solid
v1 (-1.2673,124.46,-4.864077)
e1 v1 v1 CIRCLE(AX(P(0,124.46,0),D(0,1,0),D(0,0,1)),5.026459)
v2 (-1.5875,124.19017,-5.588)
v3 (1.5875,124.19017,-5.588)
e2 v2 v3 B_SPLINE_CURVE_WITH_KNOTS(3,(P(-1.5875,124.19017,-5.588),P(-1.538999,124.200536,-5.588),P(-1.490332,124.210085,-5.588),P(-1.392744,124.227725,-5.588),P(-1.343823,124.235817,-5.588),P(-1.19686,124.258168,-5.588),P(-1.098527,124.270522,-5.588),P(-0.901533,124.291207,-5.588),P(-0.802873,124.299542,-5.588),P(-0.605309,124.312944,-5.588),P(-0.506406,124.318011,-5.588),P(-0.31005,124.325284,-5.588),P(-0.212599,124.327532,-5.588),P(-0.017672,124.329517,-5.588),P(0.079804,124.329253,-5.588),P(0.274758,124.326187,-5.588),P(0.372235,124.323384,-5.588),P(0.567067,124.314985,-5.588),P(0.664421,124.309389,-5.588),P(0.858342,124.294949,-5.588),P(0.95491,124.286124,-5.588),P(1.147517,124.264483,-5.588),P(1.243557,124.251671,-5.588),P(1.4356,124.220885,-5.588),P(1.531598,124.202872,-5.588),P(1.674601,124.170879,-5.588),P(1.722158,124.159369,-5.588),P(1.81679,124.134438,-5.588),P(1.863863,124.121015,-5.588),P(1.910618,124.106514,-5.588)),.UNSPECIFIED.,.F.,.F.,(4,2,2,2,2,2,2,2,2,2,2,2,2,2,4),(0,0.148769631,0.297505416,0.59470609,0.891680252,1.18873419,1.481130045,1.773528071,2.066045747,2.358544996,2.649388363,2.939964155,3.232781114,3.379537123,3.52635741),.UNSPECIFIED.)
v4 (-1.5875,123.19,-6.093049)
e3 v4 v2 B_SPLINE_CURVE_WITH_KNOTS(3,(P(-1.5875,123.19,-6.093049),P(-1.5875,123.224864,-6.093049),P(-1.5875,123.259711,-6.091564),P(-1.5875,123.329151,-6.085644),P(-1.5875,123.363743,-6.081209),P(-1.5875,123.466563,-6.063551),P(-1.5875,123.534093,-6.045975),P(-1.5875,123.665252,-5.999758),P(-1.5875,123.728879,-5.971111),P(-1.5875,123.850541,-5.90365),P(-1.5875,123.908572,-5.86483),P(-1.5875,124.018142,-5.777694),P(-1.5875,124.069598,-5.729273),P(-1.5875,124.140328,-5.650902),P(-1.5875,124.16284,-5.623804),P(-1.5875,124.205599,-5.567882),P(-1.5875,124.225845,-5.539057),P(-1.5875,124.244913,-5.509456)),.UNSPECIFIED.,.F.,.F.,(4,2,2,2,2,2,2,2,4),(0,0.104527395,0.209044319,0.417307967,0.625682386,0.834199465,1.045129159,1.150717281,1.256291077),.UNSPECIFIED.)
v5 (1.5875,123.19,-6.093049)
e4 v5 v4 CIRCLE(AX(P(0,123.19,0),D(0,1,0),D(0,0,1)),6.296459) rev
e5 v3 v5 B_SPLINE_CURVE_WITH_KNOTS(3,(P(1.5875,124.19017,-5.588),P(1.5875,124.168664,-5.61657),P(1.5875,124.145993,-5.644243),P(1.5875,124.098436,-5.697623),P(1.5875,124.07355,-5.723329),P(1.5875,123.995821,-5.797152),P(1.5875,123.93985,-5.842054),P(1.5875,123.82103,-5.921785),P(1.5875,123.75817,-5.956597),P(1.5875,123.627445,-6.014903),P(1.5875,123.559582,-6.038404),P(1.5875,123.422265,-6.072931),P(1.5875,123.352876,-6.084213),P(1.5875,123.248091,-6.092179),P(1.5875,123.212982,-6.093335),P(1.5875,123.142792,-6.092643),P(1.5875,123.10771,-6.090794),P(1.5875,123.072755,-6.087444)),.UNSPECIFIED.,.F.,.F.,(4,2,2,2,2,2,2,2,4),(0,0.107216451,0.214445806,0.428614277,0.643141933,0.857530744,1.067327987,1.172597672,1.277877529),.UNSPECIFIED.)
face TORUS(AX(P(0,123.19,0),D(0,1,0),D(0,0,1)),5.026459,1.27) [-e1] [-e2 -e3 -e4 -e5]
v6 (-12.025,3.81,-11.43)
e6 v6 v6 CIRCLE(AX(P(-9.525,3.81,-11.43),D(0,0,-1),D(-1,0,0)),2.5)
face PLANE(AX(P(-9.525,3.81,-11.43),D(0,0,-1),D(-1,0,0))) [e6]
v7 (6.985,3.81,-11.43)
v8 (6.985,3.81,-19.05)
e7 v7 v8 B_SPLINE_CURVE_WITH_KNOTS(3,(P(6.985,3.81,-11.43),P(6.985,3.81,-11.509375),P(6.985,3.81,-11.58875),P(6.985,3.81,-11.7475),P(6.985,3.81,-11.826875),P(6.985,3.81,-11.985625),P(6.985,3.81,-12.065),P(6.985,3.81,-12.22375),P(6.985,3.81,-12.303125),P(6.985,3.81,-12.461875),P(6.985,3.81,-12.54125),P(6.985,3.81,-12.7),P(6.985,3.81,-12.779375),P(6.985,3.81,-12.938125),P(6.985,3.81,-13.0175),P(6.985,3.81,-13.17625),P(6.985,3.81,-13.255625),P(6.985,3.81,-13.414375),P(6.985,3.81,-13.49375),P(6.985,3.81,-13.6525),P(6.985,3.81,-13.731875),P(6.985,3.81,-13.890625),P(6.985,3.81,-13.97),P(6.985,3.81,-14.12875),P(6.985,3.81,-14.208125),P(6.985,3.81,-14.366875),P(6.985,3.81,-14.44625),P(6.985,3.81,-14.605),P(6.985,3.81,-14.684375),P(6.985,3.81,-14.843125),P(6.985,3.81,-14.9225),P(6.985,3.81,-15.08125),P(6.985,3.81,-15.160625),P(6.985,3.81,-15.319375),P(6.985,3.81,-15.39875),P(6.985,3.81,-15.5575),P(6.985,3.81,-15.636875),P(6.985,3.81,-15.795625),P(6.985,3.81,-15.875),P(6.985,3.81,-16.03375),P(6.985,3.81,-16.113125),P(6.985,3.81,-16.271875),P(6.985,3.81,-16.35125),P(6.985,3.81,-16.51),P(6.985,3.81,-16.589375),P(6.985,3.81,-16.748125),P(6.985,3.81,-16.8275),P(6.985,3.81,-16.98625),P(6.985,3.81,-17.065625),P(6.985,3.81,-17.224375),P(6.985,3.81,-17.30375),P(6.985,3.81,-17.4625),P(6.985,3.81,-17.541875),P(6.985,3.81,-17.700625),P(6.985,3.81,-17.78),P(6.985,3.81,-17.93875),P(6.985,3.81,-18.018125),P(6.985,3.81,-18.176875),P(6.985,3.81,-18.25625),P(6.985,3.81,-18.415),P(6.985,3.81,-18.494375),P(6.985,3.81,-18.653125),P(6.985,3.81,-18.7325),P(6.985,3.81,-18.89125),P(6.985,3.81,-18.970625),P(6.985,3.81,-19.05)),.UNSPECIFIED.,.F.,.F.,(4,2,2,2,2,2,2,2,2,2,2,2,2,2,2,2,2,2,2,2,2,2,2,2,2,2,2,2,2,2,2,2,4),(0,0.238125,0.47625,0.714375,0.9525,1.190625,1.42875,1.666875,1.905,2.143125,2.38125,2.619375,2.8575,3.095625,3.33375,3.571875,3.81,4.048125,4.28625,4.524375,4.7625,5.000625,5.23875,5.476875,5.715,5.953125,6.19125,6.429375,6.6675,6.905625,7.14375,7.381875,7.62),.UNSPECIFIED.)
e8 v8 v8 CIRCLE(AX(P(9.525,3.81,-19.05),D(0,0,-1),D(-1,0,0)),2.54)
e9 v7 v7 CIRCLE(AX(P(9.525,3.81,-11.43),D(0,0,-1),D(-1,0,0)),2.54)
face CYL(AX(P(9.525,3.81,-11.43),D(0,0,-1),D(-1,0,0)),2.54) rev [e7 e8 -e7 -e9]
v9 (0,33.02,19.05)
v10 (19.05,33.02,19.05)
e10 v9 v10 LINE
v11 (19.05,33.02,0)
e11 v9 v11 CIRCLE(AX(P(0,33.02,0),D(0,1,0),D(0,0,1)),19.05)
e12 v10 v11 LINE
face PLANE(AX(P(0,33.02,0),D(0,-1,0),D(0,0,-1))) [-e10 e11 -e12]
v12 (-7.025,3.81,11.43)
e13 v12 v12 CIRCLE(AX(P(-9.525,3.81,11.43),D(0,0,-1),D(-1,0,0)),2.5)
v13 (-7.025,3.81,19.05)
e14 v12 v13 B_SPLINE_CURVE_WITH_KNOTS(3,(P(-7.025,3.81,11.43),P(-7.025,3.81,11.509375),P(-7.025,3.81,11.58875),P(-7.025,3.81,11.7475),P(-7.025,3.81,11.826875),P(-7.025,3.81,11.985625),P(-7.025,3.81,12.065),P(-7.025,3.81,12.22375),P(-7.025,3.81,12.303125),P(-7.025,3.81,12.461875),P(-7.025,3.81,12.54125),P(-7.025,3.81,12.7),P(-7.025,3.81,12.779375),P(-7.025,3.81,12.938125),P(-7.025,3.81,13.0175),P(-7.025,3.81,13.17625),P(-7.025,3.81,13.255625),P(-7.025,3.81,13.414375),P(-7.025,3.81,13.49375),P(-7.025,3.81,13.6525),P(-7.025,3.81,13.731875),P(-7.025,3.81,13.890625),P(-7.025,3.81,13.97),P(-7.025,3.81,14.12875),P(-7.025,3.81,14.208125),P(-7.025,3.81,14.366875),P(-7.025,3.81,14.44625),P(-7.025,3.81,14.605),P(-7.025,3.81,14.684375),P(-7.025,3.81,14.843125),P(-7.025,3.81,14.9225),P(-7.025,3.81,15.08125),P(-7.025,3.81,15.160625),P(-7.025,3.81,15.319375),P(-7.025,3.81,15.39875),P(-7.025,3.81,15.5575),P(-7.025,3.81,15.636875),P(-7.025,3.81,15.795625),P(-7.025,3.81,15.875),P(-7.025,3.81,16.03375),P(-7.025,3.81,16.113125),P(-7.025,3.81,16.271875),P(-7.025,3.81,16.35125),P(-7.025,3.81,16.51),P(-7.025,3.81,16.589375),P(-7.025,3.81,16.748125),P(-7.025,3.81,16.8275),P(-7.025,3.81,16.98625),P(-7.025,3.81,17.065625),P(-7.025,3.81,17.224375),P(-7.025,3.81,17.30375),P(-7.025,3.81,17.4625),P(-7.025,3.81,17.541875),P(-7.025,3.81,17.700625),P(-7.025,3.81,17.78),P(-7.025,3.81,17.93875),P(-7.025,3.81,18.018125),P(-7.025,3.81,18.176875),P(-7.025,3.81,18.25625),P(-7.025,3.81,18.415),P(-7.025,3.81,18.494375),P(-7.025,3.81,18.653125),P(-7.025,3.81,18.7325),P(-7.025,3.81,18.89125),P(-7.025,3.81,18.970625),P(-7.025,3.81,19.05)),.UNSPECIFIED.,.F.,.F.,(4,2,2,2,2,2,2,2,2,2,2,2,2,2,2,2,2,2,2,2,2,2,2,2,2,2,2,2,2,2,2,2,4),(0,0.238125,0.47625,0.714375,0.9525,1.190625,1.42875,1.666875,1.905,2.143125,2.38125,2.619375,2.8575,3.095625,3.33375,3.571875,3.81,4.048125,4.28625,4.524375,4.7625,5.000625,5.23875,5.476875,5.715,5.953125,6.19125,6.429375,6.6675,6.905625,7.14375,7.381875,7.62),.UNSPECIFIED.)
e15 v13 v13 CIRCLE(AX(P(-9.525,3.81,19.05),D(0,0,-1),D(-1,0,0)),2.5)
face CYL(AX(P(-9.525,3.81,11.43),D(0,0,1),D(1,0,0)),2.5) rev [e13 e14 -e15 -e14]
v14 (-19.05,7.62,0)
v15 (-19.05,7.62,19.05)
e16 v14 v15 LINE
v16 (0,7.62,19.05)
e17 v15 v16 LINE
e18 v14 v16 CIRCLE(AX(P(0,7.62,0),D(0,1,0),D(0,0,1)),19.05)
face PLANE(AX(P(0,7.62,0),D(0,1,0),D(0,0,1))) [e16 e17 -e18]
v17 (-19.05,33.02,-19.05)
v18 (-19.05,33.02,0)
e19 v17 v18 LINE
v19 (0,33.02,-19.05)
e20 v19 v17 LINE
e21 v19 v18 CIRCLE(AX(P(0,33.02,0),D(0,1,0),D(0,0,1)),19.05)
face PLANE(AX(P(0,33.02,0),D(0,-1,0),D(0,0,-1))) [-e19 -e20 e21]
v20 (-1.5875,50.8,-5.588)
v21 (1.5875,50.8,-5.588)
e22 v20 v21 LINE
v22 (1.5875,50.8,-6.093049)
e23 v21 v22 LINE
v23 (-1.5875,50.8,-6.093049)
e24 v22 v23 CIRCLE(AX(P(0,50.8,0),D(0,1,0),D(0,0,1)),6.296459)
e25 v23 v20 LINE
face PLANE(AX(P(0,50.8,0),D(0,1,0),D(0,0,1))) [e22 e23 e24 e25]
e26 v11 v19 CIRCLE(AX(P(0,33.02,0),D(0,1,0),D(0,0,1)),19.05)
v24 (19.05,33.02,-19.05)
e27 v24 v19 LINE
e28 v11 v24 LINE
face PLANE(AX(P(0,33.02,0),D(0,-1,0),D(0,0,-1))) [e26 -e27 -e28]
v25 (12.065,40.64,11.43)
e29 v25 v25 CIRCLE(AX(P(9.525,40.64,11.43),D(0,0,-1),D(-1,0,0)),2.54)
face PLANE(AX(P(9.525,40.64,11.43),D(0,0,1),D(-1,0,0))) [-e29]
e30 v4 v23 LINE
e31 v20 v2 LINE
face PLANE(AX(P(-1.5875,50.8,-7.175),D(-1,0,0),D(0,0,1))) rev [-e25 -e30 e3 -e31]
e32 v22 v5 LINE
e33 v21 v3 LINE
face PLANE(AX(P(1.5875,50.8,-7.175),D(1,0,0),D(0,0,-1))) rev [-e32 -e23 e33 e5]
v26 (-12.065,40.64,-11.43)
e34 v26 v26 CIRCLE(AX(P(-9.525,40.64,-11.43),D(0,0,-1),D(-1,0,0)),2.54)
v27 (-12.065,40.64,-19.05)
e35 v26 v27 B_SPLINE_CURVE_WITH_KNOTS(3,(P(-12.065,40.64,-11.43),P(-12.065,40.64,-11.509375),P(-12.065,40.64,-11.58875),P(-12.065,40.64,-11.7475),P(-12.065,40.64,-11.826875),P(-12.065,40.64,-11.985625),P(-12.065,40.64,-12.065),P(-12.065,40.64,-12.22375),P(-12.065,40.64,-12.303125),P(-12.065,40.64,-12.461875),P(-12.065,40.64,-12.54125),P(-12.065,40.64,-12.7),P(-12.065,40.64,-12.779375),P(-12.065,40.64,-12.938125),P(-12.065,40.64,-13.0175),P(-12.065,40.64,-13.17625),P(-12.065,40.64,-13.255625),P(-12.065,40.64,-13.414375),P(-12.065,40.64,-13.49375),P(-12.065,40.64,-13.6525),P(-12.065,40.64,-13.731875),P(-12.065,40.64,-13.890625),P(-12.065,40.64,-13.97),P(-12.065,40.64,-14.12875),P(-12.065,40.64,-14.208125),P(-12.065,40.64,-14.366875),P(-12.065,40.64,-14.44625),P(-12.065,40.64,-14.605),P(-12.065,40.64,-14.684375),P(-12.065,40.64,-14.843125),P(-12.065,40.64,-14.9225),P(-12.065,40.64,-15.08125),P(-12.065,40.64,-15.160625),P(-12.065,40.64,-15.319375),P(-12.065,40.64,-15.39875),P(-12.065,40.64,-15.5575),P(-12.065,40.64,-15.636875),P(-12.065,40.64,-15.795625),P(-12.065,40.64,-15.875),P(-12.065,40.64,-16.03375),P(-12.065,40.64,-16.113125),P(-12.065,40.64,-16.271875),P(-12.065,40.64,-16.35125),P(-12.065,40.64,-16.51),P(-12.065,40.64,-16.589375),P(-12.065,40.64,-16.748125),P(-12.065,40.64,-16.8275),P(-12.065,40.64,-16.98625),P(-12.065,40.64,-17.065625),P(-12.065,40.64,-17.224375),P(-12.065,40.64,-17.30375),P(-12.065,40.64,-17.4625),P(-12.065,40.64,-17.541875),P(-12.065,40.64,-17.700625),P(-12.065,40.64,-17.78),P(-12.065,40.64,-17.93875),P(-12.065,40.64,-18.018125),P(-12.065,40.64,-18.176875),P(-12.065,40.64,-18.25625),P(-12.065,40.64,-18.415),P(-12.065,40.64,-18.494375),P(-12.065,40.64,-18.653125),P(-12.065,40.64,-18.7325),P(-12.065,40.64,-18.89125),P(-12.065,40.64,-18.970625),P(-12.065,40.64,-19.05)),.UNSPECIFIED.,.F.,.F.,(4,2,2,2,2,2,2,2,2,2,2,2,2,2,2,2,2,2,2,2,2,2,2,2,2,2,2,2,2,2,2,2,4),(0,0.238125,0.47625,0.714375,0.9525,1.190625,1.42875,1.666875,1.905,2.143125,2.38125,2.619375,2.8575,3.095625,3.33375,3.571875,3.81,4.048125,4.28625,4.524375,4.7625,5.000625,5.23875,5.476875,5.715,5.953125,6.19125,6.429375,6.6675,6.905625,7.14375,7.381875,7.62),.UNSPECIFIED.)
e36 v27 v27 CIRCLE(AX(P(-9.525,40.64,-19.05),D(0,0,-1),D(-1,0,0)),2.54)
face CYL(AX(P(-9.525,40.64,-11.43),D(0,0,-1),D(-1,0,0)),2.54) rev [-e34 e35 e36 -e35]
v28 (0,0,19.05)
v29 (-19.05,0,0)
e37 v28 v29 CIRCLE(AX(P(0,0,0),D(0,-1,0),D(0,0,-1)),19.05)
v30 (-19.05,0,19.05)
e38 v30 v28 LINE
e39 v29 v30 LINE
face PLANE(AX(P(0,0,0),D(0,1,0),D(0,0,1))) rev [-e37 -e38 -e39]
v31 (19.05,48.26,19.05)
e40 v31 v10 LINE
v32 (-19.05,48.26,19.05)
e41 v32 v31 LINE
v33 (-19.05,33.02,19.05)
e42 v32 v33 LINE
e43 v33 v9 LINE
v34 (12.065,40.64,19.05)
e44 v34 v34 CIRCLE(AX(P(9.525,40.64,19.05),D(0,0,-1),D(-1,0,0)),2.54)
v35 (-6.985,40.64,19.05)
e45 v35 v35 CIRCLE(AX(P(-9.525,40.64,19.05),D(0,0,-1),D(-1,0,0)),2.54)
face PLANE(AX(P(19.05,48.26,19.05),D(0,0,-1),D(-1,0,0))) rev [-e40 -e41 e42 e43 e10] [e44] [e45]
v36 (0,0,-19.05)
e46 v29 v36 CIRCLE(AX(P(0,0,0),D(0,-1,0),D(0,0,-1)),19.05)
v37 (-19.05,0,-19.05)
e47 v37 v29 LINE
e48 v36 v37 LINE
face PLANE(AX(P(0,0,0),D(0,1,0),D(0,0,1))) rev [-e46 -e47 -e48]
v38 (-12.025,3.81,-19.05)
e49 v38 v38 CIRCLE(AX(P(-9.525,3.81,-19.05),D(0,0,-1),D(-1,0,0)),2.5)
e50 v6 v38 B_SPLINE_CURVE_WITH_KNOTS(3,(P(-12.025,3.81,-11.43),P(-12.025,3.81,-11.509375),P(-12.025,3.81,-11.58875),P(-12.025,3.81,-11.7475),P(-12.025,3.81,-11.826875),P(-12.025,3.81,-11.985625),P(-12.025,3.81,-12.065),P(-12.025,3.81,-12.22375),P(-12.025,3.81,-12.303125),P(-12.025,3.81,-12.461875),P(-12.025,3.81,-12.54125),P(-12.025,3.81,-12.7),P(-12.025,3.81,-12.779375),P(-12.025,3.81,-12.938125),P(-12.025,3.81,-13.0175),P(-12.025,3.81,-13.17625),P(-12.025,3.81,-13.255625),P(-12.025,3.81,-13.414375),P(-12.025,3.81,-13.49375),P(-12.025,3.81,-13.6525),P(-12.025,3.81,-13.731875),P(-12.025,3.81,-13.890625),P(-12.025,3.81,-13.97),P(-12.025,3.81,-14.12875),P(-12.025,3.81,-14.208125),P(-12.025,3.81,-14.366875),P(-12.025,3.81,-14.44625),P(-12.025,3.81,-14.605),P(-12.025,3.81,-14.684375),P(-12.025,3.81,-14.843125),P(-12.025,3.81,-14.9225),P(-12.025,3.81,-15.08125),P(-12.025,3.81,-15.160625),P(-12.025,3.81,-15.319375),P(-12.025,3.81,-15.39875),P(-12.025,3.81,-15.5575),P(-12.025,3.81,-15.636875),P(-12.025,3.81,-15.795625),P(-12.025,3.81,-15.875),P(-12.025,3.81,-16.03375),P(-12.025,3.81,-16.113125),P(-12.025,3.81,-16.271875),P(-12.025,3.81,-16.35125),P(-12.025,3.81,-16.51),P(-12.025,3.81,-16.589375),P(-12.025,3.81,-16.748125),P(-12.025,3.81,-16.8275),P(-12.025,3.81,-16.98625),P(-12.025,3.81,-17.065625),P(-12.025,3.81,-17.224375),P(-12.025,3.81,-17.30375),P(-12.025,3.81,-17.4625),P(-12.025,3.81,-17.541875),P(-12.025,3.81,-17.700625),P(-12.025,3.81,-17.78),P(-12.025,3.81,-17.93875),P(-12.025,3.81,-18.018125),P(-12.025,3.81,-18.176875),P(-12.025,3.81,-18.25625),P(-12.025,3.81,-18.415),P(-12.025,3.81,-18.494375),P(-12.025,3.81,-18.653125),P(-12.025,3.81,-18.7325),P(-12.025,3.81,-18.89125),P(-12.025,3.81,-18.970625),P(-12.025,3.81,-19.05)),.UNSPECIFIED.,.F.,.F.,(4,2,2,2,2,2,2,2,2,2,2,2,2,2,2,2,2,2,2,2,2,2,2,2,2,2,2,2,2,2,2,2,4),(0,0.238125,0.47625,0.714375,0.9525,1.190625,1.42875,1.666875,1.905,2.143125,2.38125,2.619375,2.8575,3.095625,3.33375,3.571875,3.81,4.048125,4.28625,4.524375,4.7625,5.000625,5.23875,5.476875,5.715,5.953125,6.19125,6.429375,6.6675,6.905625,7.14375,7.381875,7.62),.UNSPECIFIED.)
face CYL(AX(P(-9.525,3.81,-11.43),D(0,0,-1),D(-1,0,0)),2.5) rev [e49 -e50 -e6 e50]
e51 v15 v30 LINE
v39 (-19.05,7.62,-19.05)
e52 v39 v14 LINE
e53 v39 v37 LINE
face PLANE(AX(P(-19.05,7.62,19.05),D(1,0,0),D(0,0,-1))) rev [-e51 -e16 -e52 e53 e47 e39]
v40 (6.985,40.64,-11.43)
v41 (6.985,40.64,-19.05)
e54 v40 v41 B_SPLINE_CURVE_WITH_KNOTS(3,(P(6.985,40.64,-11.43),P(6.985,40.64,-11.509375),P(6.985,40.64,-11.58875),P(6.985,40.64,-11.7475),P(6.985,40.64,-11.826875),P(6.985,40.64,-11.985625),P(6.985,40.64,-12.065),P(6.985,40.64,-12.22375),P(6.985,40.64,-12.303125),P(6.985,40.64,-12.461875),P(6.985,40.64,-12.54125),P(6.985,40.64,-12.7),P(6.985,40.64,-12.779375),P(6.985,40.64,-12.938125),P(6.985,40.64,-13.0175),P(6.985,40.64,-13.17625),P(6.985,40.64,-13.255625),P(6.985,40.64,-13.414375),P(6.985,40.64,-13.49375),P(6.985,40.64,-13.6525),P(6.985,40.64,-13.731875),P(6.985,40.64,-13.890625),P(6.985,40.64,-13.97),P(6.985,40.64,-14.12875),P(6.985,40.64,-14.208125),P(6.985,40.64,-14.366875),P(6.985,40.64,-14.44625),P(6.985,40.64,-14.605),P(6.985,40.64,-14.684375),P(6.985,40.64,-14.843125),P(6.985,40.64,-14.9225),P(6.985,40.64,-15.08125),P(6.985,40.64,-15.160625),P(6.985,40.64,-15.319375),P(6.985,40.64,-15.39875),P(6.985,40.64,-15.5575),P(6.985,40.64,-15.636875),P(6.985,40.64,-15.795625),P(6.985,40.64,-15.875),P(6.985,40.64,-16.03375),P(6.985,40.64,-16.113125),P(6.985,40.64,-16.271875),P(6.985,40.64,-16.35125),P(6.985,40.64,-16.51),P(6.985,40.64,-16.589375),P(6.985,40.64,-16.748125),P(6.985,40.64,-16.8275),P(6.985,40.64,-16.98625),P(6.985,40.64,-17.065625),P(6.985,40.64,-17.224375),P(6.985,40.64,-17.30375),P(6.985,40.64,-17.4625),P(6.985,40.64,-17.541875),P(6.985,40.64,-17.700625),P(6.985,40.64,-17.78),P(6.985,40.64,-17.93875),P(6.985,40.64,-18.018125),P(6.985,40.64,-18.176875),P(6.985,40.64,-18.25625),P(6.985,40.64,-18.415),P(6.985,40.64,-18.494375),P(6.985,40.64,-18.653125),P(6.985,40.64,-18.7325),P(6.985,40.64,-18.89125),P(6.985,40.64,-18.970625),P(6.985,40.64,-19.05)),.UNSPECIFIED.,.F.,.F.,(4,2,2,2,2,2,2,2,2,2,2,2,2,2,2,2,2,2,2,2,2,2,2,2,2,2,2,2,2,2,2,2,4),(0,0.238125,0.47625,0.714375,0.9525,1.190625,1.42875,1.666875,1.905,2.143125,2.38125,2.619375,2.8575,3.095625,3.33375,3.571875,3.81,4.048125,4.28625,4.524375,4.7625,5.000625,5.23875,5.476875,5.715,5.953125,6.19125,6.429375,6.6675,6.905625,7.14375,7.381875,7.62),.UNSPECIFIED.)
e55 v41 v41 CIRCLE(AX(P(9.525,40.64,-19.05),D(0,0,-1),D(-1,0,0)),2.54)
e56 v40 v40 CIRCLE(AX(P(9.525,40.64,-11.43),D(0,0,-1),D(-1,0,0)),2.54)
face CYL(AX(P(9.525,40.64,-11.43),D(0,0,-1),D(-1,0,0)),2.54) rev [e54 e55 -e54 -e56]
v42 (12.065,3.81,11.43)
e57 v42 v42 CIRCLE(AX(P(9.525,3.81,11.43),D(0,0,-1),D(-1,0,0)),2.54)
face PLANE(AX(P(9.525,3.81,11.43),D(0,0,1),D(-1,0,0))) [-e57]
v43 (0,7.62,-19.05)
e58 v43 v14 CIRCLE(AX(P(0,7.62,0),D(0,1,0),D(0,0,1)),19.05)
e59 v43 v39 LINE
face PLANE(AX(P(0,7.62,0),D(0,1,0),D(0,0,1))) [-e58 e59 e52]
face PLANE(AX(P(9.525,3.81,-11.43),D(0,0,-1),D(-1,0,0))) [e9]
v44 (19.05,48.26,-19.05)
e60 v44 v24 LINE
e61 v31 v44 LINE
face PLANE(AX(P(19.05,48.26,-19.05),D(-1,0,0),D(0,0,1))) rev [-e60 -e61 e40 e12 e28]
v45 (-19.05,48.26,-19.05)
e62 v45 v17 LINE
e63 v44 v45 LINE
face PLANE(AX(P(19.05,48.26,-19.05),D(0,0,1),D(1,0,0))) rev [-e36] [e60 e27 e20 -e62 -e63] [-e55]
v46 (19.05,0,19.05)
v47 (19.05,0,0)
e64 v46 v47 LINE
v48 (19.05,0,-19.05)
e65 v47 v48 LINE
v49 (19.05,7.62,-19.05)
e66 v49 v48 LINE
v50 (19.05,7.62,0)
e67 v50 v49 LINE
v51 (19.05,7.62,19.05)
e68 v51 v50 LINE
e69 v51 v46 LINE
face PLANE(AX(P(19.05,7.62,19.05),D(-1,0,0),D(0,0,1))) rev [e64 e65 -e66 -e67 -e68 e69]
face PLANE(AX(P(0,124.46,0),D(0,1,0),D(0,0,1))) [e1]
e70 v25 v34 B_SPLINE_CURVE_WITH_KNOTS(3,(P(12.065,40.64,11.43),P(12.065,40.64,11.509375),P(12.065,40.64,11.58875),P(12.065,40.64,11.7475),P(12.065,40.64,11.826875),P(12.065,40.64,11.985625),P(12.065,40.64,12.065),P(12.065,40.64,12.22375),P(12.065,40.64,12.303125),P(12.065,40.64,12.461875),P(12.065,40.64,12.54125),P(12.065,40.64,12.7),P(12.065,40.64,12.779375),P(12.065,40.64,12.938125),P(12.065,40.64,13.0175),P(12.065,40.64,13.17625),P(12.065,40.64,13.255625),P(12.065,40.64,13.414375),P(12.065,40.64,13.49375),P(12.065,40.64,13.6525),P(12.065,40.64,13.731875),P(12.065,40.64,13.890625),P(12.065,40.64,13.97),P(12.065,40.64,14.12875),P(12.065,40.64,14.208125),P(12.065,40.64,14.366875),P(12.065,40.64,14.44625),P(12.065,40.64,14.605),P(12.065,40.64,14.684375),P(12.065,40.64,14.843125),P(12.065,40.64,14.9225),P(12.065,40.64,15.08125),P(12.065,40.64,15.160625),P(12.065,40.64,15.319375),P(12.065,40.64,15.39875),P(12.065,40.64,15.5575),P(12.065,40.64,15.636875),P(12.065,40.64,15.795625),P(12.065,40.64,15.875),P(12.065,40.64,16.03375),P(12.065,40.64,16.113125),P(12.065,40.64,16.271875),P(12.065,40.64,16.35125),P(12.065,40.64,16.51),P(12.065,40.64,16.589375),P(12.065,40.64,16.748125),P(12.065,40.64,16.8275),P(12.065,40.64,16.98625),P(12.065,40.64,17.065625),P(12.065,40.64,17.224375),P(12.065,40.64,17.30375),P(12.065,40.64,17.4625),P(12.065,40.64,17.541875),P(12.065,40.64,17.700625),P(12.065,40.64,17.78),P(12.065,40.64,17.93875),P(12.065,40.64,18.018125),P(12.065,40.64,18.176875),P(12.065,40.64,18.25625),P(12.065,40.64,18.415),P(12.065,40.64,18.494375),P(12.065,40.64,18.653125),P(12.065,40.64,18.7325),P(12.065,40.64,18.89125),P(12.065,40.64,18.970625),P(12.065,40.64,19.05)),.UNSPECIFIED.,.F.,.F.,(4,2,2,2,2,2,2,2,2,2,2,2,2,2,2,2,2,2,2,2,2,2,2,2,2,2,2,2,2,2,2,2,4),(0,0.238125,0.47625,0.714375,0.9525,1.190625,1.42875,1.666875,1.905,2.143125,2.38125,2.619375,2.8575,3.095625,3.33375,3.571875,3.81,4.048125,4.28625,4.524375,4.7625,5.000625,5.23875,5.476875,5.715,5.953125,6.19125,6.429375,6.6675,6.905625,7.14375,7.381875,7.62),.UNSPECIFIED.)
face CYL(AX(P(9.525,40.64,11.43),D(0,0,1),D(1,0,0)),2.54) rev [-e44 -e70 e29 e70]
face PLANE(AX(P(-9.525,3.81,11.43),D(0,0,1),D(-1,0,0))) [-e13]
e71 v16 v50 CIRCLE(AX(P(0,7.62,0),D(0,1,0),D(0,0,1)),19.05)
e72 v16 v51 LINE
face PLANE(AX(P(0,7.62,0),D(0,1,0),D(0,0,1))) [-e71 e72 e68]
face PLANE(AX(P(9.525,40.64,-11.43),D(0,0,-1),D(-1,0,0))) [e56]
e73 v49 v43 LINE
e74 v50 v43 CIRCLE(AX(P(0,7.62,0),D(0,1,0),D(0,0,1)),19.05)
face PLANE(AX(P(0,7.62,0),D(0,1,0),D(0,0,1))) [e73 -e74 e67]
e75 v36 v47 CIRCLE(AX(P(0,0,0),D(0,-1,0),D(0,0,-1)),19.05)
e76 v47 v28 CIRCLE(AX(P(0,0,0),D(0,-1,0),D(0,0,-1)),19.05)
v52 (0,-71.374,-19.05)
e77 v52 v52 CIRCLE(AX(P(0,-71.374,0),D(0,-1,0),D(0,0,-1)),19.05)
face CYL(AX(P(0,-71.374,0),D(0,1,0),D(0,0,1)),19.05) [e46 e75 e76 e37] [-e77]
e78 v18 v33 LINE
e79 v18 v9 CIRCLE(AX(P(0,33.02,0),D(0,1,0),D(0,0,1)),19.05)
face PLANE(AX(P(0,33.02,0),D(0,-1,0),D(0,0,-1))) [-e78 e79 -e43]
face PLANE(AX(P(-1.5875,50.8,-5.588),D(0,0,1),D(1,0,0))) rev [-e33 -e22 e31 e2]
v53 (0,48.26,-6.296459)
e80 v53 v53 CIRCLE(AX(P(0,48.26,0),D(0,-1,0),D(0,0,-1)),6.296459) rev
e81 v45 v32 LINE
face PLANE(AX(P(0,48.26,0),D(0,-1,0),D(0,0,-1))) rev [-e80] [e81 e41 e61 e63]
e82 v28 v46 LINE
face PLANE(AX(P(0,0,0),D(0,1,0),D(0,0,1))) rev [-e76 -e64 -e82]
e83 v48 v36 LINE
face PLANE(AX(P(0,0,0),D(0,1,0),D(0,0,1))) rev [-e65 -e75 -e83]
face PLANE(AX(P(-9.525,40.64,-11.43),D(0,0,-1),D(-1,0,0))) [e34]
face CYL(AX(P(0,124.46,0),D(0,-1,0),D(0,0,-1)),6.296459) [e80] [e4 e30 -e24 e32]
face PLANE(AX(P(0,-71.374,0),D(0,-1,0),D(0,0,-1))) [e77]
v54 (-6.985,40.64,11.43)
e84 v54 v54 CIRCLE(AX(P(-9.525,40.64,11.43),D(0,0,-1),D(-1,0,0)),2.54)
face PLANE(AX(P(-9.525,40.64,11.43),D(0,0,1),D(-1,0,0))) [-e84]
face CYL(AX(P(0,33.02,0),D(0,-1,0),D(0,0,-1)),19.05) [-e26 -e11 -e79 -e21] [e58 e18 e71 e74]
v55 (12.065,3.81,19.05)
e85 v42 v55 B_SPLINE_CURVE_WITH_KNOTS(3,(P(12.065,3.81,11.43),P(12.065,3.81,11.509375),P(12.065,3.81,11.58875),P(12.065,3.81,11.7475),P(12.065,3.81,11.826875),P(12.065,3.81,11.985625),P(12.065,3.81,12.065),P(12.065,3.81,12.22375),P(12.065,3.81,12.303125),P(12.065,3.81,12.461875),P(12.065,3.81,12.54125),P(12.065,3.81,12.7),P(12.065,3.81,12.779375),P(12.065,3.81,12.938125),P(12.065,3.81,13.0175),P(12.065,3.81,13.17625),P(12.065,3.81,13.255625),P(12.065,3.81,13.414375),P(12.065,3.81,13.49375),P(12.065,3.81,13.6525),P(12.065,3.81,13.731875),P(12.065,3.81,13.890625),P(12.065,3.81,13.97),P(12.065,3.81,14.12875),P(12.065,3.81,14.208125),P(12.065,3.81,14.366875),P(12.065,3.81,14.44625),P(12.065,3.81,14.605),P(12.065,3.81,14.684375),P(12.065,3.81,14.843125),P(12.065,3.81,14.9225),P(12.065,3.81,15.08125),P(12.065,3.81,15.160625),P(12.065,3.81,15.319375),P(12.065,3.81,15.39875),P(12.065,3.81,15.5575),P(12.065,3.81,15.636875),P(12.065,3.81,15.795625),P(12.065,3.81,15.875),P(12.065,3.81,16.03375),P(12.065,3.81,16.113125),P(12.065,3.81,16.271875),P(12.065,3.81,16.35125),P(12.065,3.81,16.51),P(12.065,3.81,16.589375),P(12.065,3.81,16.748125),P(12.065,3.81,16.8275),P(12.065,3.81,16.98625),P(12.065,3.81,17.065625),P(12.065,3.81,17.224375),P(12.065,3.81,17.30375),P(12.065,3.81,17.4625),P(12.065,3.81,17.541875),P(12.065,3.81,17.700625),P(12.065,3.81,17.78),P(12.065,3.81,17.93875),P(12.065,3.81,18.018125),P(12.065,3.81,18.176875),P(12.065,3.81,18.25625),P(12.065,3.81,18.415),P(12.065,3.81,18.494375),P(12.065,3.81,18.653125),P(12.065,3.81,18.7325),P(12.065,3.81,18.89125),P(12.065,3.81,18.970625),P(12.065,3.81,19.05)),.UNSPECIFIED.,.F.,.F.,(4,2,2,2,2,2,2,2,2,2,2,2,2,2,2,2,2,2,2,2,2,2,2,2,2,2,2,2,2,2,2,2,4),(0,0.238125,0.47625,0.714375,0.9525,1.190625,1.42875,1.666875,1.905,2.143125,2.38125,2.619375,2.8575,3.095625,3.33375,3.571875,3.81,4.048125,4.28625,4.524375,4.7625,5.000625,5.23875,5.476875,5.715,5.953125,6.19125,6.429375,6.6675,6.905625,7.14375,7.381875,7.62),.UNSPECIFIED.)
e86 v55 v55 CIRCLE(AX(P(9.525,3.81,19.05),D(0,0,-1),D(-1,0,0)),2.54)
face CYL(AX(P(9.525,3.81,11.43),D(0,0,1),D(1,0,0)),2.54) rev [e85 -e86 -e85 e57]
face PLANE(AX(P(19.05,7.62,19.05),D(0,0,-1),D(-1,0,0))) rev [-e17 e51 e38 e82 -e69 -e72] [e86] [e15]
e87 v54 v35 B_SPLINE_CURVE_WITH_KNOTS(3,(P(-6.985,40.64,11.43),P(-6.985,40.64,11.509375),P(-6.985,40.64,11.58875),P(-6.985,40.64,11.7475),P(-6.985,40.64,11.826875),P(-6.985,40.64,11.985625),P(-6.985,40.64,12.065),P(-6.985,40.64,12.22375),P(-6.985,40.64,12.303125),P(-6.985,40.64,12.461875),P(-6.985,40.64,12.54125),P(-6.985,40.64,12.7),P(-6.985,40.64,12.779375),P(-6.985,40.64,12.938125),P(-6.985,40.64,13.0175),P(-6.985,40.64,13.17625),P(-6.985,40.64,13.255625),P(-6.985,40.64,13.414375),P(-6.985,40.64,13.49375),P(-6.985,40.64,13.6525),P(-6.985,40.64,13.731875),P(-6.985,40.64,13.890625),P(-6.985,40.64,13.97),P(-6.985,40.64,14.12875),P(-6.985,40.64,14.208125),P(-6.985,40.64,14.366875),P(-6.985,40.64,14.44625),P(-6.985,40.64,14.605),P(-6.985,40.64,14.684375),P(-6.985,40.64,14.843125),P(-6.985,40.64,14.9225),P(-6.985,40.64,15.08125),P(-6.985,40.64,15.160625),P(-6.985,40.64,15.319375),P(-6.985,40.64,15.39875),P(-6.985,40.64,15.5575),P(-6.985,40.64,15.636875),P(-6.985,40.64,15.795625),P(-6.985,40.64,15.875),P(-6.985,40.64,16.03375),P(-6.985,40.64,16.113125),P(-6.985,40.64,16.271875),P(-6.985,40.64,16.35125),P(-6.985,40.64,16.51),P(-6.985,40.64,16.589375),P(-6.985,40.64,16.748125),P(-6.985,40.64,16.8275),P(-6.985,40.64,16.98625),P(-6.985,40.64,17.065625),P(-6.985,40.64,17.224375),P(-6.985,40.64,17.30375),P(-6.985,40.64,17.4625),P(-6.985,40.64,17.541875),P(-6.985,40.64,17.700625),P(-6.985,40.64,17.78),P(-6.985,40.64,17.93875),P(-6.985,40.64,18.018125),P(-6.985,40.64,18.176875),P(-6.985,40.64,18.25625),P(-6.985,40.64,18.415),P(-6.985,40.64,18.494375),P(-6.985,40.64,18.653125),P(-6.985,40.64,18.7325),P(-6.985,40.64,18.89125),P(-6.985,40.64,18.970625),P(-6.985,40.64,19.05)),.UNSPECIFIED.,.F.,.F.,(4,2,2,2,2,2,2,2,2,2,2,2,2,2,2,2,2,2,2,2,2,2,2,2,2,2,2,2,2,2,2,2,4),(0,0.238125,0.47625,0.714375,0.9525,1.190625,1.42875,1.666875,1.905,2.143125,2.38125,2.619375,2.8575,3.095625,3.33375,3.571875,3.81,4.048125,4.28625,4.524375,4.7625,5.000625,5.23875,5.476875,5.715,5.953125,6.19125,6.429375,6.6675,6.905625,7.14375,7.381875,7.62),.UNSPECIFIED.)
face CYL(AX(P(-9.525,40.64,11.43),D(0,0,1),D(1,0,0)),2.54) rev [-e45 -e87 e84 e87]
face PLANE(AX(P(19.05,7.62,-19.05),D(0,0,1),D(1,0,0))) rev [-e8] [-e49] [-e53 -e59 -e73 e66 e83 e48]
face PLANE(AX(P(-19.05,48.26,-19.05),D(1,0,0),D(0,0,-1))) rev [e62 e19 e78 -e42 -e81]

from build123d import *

# Parameters (mm, degrees)
SKETCH1_W           = 38.1
SKETCH1_H           = 38.1
BOSS_EXTRUDE1_DEPTH = 7.62
SKETCH2_R           = 19.05
BOSS_EXTRUDE2_DEPTH = 25.4
SKETCH3_W           = 38.1
SKETCH3_H           = 38.1
BOSS_EXTRUDE3_DEPTH = 15.24
SKETCH4_R           = 6.296459426
BOSS_EXTRUDE4_DEPTH = 76.2
SKETCH5_W           = 3.175
SKETCH5_H           = 1.58699954
CUT_EXTRUDE1_DEPTH  = 73.66
SKETCH6_R           = 2.54
SKETCH6_R_2         = 2.5
CUT_EXTRUDE2_DEPTH  = 7.62
BOSS_EXTRUDE5_START = 71.374
SKETCH7_R           = 19.05
BOSS_EXTRUDE5_DEPTH = 71.374


with BuildPart() as part:
    # Sketch1 → Boss-Extrude1 (new body)
    with BuildSketch(Plane(origin=(0, 0, 0), x_dir=(1, 0, 0), z_dir=(0, 1, 0))):
        Rectangle(SKETCH1_W, SKETCH1_H)
    extrude(amount=BOSS_EXTRUDE1_DEPTH)

    # Sketch2 → Boss-Extrude2 (add)
    with BuildSketch(Plane(origin=(0, 7.62, 0), x_dir=(1, 0, 0), z_dir=(0, 1, 0))):
        with Locations(Location((0, 0, 0), (0, 0, 270))):
            Circle(SKETCH2_R)
    extrude(amount=BOSS_EXTRUDE2_DEPTH)

    # Sketch3 → Boss-Extrude3 (add)
    with BuildSketch(Plane(origin=(0, 33.02, 0), x_dir=(1, 0, 0), z_dir=(0, 1, 0))):
        Rectangle(SKETCH3_W, SKETCH3_H)
    extrude(amount=BOSS_EXTRUDE3_DEPTH)

    # Sketch4 → Boss-Extrude4 (add)
    with BuildSketch(Plane(origin=(0, 48.26, 0), x_dir=(1, 0, 0), z_dir=(0, 1, 0))):
        with Locations(Location((0, 0, 0), (0, 0, 90))):
            Circle(SKETCH4_R)
    extrude(amount=BOSS_EXTRUDE4_DEPTH)

    # Sketch5 → Cut-Extrude1 (cut)
    with BuildSketch(Plane(origin=(0, 124.46, 0), x_dir=(1, 0, 0), z_dir=(0, 1, 0))):
        with Locations((0, 6.38149977)):
            Rectangle(SKETCH5_W, SKETCH5_H)
    extrude(amount=-CUT_EXTRUDE1_DEPTH, mode=Mode.SUBTRACT)

    # Fillet1: read off the stored shape, not the designer's step
    # Fillet1 outline → Fillet1 (revolve, cut)
    with BuildSketch(Plane.XY):
        with BuildLine():
            ThreePointArc((5.026459426, 124.46), (5.924485038, 124.088025612), (6.296459426, 123.19))
            Line((6.296459426, 123.19), (6.296459426, 124.46))
            Line((6.296459426, 124.46), (5.026459426, 124.46))
        make_face()
    revolve(axis=Axis((0, 0, 0), (0, 1, 0)), mode=Mode.SUBTRACT)

    # Sketch6 → Cut-Extrude2 (cut)
    with BuildSketch(Plane(origin=(0, 0, -19.05), x_dir=(-1, 0, 0), z_dir=(0, 0, -1))):
        with Locations((-9.525, 3.81)):
            Circle(SKETCH6_R)
        with Locations((-9.525, 40.64)):
            Circle(SKETCH6_R)
        with Locations((9.525, 40.64)):
            Circle(SKETCH6_R)
        with Locations((9.525, 3.81)):
            Circle(SKETCH6_R_2)
    cut_extrude2 = extrude(amount=-CUT_EXTRUDE2_DEPTH, mode=Mode.SUBTRACT)

    # Mirror1: Cut-Extrude2 across plane
    add(cut_extrude2.mirror(Plane.XY), mode=Mode.SUBTRACT)

    # Sketch7 → Boss-Extrude5 (add)
    with BuildSketch(Plane.XZ.offset(BOSS_EXTRUDE5_START)):
        with Locations(Location((0, 0, 0), (0, 0, 270))):
            Circle(SKETCH7_R)
    extrude(amount=-BOSS_EXTRUDE5_DEPTH)


solid = part.part
